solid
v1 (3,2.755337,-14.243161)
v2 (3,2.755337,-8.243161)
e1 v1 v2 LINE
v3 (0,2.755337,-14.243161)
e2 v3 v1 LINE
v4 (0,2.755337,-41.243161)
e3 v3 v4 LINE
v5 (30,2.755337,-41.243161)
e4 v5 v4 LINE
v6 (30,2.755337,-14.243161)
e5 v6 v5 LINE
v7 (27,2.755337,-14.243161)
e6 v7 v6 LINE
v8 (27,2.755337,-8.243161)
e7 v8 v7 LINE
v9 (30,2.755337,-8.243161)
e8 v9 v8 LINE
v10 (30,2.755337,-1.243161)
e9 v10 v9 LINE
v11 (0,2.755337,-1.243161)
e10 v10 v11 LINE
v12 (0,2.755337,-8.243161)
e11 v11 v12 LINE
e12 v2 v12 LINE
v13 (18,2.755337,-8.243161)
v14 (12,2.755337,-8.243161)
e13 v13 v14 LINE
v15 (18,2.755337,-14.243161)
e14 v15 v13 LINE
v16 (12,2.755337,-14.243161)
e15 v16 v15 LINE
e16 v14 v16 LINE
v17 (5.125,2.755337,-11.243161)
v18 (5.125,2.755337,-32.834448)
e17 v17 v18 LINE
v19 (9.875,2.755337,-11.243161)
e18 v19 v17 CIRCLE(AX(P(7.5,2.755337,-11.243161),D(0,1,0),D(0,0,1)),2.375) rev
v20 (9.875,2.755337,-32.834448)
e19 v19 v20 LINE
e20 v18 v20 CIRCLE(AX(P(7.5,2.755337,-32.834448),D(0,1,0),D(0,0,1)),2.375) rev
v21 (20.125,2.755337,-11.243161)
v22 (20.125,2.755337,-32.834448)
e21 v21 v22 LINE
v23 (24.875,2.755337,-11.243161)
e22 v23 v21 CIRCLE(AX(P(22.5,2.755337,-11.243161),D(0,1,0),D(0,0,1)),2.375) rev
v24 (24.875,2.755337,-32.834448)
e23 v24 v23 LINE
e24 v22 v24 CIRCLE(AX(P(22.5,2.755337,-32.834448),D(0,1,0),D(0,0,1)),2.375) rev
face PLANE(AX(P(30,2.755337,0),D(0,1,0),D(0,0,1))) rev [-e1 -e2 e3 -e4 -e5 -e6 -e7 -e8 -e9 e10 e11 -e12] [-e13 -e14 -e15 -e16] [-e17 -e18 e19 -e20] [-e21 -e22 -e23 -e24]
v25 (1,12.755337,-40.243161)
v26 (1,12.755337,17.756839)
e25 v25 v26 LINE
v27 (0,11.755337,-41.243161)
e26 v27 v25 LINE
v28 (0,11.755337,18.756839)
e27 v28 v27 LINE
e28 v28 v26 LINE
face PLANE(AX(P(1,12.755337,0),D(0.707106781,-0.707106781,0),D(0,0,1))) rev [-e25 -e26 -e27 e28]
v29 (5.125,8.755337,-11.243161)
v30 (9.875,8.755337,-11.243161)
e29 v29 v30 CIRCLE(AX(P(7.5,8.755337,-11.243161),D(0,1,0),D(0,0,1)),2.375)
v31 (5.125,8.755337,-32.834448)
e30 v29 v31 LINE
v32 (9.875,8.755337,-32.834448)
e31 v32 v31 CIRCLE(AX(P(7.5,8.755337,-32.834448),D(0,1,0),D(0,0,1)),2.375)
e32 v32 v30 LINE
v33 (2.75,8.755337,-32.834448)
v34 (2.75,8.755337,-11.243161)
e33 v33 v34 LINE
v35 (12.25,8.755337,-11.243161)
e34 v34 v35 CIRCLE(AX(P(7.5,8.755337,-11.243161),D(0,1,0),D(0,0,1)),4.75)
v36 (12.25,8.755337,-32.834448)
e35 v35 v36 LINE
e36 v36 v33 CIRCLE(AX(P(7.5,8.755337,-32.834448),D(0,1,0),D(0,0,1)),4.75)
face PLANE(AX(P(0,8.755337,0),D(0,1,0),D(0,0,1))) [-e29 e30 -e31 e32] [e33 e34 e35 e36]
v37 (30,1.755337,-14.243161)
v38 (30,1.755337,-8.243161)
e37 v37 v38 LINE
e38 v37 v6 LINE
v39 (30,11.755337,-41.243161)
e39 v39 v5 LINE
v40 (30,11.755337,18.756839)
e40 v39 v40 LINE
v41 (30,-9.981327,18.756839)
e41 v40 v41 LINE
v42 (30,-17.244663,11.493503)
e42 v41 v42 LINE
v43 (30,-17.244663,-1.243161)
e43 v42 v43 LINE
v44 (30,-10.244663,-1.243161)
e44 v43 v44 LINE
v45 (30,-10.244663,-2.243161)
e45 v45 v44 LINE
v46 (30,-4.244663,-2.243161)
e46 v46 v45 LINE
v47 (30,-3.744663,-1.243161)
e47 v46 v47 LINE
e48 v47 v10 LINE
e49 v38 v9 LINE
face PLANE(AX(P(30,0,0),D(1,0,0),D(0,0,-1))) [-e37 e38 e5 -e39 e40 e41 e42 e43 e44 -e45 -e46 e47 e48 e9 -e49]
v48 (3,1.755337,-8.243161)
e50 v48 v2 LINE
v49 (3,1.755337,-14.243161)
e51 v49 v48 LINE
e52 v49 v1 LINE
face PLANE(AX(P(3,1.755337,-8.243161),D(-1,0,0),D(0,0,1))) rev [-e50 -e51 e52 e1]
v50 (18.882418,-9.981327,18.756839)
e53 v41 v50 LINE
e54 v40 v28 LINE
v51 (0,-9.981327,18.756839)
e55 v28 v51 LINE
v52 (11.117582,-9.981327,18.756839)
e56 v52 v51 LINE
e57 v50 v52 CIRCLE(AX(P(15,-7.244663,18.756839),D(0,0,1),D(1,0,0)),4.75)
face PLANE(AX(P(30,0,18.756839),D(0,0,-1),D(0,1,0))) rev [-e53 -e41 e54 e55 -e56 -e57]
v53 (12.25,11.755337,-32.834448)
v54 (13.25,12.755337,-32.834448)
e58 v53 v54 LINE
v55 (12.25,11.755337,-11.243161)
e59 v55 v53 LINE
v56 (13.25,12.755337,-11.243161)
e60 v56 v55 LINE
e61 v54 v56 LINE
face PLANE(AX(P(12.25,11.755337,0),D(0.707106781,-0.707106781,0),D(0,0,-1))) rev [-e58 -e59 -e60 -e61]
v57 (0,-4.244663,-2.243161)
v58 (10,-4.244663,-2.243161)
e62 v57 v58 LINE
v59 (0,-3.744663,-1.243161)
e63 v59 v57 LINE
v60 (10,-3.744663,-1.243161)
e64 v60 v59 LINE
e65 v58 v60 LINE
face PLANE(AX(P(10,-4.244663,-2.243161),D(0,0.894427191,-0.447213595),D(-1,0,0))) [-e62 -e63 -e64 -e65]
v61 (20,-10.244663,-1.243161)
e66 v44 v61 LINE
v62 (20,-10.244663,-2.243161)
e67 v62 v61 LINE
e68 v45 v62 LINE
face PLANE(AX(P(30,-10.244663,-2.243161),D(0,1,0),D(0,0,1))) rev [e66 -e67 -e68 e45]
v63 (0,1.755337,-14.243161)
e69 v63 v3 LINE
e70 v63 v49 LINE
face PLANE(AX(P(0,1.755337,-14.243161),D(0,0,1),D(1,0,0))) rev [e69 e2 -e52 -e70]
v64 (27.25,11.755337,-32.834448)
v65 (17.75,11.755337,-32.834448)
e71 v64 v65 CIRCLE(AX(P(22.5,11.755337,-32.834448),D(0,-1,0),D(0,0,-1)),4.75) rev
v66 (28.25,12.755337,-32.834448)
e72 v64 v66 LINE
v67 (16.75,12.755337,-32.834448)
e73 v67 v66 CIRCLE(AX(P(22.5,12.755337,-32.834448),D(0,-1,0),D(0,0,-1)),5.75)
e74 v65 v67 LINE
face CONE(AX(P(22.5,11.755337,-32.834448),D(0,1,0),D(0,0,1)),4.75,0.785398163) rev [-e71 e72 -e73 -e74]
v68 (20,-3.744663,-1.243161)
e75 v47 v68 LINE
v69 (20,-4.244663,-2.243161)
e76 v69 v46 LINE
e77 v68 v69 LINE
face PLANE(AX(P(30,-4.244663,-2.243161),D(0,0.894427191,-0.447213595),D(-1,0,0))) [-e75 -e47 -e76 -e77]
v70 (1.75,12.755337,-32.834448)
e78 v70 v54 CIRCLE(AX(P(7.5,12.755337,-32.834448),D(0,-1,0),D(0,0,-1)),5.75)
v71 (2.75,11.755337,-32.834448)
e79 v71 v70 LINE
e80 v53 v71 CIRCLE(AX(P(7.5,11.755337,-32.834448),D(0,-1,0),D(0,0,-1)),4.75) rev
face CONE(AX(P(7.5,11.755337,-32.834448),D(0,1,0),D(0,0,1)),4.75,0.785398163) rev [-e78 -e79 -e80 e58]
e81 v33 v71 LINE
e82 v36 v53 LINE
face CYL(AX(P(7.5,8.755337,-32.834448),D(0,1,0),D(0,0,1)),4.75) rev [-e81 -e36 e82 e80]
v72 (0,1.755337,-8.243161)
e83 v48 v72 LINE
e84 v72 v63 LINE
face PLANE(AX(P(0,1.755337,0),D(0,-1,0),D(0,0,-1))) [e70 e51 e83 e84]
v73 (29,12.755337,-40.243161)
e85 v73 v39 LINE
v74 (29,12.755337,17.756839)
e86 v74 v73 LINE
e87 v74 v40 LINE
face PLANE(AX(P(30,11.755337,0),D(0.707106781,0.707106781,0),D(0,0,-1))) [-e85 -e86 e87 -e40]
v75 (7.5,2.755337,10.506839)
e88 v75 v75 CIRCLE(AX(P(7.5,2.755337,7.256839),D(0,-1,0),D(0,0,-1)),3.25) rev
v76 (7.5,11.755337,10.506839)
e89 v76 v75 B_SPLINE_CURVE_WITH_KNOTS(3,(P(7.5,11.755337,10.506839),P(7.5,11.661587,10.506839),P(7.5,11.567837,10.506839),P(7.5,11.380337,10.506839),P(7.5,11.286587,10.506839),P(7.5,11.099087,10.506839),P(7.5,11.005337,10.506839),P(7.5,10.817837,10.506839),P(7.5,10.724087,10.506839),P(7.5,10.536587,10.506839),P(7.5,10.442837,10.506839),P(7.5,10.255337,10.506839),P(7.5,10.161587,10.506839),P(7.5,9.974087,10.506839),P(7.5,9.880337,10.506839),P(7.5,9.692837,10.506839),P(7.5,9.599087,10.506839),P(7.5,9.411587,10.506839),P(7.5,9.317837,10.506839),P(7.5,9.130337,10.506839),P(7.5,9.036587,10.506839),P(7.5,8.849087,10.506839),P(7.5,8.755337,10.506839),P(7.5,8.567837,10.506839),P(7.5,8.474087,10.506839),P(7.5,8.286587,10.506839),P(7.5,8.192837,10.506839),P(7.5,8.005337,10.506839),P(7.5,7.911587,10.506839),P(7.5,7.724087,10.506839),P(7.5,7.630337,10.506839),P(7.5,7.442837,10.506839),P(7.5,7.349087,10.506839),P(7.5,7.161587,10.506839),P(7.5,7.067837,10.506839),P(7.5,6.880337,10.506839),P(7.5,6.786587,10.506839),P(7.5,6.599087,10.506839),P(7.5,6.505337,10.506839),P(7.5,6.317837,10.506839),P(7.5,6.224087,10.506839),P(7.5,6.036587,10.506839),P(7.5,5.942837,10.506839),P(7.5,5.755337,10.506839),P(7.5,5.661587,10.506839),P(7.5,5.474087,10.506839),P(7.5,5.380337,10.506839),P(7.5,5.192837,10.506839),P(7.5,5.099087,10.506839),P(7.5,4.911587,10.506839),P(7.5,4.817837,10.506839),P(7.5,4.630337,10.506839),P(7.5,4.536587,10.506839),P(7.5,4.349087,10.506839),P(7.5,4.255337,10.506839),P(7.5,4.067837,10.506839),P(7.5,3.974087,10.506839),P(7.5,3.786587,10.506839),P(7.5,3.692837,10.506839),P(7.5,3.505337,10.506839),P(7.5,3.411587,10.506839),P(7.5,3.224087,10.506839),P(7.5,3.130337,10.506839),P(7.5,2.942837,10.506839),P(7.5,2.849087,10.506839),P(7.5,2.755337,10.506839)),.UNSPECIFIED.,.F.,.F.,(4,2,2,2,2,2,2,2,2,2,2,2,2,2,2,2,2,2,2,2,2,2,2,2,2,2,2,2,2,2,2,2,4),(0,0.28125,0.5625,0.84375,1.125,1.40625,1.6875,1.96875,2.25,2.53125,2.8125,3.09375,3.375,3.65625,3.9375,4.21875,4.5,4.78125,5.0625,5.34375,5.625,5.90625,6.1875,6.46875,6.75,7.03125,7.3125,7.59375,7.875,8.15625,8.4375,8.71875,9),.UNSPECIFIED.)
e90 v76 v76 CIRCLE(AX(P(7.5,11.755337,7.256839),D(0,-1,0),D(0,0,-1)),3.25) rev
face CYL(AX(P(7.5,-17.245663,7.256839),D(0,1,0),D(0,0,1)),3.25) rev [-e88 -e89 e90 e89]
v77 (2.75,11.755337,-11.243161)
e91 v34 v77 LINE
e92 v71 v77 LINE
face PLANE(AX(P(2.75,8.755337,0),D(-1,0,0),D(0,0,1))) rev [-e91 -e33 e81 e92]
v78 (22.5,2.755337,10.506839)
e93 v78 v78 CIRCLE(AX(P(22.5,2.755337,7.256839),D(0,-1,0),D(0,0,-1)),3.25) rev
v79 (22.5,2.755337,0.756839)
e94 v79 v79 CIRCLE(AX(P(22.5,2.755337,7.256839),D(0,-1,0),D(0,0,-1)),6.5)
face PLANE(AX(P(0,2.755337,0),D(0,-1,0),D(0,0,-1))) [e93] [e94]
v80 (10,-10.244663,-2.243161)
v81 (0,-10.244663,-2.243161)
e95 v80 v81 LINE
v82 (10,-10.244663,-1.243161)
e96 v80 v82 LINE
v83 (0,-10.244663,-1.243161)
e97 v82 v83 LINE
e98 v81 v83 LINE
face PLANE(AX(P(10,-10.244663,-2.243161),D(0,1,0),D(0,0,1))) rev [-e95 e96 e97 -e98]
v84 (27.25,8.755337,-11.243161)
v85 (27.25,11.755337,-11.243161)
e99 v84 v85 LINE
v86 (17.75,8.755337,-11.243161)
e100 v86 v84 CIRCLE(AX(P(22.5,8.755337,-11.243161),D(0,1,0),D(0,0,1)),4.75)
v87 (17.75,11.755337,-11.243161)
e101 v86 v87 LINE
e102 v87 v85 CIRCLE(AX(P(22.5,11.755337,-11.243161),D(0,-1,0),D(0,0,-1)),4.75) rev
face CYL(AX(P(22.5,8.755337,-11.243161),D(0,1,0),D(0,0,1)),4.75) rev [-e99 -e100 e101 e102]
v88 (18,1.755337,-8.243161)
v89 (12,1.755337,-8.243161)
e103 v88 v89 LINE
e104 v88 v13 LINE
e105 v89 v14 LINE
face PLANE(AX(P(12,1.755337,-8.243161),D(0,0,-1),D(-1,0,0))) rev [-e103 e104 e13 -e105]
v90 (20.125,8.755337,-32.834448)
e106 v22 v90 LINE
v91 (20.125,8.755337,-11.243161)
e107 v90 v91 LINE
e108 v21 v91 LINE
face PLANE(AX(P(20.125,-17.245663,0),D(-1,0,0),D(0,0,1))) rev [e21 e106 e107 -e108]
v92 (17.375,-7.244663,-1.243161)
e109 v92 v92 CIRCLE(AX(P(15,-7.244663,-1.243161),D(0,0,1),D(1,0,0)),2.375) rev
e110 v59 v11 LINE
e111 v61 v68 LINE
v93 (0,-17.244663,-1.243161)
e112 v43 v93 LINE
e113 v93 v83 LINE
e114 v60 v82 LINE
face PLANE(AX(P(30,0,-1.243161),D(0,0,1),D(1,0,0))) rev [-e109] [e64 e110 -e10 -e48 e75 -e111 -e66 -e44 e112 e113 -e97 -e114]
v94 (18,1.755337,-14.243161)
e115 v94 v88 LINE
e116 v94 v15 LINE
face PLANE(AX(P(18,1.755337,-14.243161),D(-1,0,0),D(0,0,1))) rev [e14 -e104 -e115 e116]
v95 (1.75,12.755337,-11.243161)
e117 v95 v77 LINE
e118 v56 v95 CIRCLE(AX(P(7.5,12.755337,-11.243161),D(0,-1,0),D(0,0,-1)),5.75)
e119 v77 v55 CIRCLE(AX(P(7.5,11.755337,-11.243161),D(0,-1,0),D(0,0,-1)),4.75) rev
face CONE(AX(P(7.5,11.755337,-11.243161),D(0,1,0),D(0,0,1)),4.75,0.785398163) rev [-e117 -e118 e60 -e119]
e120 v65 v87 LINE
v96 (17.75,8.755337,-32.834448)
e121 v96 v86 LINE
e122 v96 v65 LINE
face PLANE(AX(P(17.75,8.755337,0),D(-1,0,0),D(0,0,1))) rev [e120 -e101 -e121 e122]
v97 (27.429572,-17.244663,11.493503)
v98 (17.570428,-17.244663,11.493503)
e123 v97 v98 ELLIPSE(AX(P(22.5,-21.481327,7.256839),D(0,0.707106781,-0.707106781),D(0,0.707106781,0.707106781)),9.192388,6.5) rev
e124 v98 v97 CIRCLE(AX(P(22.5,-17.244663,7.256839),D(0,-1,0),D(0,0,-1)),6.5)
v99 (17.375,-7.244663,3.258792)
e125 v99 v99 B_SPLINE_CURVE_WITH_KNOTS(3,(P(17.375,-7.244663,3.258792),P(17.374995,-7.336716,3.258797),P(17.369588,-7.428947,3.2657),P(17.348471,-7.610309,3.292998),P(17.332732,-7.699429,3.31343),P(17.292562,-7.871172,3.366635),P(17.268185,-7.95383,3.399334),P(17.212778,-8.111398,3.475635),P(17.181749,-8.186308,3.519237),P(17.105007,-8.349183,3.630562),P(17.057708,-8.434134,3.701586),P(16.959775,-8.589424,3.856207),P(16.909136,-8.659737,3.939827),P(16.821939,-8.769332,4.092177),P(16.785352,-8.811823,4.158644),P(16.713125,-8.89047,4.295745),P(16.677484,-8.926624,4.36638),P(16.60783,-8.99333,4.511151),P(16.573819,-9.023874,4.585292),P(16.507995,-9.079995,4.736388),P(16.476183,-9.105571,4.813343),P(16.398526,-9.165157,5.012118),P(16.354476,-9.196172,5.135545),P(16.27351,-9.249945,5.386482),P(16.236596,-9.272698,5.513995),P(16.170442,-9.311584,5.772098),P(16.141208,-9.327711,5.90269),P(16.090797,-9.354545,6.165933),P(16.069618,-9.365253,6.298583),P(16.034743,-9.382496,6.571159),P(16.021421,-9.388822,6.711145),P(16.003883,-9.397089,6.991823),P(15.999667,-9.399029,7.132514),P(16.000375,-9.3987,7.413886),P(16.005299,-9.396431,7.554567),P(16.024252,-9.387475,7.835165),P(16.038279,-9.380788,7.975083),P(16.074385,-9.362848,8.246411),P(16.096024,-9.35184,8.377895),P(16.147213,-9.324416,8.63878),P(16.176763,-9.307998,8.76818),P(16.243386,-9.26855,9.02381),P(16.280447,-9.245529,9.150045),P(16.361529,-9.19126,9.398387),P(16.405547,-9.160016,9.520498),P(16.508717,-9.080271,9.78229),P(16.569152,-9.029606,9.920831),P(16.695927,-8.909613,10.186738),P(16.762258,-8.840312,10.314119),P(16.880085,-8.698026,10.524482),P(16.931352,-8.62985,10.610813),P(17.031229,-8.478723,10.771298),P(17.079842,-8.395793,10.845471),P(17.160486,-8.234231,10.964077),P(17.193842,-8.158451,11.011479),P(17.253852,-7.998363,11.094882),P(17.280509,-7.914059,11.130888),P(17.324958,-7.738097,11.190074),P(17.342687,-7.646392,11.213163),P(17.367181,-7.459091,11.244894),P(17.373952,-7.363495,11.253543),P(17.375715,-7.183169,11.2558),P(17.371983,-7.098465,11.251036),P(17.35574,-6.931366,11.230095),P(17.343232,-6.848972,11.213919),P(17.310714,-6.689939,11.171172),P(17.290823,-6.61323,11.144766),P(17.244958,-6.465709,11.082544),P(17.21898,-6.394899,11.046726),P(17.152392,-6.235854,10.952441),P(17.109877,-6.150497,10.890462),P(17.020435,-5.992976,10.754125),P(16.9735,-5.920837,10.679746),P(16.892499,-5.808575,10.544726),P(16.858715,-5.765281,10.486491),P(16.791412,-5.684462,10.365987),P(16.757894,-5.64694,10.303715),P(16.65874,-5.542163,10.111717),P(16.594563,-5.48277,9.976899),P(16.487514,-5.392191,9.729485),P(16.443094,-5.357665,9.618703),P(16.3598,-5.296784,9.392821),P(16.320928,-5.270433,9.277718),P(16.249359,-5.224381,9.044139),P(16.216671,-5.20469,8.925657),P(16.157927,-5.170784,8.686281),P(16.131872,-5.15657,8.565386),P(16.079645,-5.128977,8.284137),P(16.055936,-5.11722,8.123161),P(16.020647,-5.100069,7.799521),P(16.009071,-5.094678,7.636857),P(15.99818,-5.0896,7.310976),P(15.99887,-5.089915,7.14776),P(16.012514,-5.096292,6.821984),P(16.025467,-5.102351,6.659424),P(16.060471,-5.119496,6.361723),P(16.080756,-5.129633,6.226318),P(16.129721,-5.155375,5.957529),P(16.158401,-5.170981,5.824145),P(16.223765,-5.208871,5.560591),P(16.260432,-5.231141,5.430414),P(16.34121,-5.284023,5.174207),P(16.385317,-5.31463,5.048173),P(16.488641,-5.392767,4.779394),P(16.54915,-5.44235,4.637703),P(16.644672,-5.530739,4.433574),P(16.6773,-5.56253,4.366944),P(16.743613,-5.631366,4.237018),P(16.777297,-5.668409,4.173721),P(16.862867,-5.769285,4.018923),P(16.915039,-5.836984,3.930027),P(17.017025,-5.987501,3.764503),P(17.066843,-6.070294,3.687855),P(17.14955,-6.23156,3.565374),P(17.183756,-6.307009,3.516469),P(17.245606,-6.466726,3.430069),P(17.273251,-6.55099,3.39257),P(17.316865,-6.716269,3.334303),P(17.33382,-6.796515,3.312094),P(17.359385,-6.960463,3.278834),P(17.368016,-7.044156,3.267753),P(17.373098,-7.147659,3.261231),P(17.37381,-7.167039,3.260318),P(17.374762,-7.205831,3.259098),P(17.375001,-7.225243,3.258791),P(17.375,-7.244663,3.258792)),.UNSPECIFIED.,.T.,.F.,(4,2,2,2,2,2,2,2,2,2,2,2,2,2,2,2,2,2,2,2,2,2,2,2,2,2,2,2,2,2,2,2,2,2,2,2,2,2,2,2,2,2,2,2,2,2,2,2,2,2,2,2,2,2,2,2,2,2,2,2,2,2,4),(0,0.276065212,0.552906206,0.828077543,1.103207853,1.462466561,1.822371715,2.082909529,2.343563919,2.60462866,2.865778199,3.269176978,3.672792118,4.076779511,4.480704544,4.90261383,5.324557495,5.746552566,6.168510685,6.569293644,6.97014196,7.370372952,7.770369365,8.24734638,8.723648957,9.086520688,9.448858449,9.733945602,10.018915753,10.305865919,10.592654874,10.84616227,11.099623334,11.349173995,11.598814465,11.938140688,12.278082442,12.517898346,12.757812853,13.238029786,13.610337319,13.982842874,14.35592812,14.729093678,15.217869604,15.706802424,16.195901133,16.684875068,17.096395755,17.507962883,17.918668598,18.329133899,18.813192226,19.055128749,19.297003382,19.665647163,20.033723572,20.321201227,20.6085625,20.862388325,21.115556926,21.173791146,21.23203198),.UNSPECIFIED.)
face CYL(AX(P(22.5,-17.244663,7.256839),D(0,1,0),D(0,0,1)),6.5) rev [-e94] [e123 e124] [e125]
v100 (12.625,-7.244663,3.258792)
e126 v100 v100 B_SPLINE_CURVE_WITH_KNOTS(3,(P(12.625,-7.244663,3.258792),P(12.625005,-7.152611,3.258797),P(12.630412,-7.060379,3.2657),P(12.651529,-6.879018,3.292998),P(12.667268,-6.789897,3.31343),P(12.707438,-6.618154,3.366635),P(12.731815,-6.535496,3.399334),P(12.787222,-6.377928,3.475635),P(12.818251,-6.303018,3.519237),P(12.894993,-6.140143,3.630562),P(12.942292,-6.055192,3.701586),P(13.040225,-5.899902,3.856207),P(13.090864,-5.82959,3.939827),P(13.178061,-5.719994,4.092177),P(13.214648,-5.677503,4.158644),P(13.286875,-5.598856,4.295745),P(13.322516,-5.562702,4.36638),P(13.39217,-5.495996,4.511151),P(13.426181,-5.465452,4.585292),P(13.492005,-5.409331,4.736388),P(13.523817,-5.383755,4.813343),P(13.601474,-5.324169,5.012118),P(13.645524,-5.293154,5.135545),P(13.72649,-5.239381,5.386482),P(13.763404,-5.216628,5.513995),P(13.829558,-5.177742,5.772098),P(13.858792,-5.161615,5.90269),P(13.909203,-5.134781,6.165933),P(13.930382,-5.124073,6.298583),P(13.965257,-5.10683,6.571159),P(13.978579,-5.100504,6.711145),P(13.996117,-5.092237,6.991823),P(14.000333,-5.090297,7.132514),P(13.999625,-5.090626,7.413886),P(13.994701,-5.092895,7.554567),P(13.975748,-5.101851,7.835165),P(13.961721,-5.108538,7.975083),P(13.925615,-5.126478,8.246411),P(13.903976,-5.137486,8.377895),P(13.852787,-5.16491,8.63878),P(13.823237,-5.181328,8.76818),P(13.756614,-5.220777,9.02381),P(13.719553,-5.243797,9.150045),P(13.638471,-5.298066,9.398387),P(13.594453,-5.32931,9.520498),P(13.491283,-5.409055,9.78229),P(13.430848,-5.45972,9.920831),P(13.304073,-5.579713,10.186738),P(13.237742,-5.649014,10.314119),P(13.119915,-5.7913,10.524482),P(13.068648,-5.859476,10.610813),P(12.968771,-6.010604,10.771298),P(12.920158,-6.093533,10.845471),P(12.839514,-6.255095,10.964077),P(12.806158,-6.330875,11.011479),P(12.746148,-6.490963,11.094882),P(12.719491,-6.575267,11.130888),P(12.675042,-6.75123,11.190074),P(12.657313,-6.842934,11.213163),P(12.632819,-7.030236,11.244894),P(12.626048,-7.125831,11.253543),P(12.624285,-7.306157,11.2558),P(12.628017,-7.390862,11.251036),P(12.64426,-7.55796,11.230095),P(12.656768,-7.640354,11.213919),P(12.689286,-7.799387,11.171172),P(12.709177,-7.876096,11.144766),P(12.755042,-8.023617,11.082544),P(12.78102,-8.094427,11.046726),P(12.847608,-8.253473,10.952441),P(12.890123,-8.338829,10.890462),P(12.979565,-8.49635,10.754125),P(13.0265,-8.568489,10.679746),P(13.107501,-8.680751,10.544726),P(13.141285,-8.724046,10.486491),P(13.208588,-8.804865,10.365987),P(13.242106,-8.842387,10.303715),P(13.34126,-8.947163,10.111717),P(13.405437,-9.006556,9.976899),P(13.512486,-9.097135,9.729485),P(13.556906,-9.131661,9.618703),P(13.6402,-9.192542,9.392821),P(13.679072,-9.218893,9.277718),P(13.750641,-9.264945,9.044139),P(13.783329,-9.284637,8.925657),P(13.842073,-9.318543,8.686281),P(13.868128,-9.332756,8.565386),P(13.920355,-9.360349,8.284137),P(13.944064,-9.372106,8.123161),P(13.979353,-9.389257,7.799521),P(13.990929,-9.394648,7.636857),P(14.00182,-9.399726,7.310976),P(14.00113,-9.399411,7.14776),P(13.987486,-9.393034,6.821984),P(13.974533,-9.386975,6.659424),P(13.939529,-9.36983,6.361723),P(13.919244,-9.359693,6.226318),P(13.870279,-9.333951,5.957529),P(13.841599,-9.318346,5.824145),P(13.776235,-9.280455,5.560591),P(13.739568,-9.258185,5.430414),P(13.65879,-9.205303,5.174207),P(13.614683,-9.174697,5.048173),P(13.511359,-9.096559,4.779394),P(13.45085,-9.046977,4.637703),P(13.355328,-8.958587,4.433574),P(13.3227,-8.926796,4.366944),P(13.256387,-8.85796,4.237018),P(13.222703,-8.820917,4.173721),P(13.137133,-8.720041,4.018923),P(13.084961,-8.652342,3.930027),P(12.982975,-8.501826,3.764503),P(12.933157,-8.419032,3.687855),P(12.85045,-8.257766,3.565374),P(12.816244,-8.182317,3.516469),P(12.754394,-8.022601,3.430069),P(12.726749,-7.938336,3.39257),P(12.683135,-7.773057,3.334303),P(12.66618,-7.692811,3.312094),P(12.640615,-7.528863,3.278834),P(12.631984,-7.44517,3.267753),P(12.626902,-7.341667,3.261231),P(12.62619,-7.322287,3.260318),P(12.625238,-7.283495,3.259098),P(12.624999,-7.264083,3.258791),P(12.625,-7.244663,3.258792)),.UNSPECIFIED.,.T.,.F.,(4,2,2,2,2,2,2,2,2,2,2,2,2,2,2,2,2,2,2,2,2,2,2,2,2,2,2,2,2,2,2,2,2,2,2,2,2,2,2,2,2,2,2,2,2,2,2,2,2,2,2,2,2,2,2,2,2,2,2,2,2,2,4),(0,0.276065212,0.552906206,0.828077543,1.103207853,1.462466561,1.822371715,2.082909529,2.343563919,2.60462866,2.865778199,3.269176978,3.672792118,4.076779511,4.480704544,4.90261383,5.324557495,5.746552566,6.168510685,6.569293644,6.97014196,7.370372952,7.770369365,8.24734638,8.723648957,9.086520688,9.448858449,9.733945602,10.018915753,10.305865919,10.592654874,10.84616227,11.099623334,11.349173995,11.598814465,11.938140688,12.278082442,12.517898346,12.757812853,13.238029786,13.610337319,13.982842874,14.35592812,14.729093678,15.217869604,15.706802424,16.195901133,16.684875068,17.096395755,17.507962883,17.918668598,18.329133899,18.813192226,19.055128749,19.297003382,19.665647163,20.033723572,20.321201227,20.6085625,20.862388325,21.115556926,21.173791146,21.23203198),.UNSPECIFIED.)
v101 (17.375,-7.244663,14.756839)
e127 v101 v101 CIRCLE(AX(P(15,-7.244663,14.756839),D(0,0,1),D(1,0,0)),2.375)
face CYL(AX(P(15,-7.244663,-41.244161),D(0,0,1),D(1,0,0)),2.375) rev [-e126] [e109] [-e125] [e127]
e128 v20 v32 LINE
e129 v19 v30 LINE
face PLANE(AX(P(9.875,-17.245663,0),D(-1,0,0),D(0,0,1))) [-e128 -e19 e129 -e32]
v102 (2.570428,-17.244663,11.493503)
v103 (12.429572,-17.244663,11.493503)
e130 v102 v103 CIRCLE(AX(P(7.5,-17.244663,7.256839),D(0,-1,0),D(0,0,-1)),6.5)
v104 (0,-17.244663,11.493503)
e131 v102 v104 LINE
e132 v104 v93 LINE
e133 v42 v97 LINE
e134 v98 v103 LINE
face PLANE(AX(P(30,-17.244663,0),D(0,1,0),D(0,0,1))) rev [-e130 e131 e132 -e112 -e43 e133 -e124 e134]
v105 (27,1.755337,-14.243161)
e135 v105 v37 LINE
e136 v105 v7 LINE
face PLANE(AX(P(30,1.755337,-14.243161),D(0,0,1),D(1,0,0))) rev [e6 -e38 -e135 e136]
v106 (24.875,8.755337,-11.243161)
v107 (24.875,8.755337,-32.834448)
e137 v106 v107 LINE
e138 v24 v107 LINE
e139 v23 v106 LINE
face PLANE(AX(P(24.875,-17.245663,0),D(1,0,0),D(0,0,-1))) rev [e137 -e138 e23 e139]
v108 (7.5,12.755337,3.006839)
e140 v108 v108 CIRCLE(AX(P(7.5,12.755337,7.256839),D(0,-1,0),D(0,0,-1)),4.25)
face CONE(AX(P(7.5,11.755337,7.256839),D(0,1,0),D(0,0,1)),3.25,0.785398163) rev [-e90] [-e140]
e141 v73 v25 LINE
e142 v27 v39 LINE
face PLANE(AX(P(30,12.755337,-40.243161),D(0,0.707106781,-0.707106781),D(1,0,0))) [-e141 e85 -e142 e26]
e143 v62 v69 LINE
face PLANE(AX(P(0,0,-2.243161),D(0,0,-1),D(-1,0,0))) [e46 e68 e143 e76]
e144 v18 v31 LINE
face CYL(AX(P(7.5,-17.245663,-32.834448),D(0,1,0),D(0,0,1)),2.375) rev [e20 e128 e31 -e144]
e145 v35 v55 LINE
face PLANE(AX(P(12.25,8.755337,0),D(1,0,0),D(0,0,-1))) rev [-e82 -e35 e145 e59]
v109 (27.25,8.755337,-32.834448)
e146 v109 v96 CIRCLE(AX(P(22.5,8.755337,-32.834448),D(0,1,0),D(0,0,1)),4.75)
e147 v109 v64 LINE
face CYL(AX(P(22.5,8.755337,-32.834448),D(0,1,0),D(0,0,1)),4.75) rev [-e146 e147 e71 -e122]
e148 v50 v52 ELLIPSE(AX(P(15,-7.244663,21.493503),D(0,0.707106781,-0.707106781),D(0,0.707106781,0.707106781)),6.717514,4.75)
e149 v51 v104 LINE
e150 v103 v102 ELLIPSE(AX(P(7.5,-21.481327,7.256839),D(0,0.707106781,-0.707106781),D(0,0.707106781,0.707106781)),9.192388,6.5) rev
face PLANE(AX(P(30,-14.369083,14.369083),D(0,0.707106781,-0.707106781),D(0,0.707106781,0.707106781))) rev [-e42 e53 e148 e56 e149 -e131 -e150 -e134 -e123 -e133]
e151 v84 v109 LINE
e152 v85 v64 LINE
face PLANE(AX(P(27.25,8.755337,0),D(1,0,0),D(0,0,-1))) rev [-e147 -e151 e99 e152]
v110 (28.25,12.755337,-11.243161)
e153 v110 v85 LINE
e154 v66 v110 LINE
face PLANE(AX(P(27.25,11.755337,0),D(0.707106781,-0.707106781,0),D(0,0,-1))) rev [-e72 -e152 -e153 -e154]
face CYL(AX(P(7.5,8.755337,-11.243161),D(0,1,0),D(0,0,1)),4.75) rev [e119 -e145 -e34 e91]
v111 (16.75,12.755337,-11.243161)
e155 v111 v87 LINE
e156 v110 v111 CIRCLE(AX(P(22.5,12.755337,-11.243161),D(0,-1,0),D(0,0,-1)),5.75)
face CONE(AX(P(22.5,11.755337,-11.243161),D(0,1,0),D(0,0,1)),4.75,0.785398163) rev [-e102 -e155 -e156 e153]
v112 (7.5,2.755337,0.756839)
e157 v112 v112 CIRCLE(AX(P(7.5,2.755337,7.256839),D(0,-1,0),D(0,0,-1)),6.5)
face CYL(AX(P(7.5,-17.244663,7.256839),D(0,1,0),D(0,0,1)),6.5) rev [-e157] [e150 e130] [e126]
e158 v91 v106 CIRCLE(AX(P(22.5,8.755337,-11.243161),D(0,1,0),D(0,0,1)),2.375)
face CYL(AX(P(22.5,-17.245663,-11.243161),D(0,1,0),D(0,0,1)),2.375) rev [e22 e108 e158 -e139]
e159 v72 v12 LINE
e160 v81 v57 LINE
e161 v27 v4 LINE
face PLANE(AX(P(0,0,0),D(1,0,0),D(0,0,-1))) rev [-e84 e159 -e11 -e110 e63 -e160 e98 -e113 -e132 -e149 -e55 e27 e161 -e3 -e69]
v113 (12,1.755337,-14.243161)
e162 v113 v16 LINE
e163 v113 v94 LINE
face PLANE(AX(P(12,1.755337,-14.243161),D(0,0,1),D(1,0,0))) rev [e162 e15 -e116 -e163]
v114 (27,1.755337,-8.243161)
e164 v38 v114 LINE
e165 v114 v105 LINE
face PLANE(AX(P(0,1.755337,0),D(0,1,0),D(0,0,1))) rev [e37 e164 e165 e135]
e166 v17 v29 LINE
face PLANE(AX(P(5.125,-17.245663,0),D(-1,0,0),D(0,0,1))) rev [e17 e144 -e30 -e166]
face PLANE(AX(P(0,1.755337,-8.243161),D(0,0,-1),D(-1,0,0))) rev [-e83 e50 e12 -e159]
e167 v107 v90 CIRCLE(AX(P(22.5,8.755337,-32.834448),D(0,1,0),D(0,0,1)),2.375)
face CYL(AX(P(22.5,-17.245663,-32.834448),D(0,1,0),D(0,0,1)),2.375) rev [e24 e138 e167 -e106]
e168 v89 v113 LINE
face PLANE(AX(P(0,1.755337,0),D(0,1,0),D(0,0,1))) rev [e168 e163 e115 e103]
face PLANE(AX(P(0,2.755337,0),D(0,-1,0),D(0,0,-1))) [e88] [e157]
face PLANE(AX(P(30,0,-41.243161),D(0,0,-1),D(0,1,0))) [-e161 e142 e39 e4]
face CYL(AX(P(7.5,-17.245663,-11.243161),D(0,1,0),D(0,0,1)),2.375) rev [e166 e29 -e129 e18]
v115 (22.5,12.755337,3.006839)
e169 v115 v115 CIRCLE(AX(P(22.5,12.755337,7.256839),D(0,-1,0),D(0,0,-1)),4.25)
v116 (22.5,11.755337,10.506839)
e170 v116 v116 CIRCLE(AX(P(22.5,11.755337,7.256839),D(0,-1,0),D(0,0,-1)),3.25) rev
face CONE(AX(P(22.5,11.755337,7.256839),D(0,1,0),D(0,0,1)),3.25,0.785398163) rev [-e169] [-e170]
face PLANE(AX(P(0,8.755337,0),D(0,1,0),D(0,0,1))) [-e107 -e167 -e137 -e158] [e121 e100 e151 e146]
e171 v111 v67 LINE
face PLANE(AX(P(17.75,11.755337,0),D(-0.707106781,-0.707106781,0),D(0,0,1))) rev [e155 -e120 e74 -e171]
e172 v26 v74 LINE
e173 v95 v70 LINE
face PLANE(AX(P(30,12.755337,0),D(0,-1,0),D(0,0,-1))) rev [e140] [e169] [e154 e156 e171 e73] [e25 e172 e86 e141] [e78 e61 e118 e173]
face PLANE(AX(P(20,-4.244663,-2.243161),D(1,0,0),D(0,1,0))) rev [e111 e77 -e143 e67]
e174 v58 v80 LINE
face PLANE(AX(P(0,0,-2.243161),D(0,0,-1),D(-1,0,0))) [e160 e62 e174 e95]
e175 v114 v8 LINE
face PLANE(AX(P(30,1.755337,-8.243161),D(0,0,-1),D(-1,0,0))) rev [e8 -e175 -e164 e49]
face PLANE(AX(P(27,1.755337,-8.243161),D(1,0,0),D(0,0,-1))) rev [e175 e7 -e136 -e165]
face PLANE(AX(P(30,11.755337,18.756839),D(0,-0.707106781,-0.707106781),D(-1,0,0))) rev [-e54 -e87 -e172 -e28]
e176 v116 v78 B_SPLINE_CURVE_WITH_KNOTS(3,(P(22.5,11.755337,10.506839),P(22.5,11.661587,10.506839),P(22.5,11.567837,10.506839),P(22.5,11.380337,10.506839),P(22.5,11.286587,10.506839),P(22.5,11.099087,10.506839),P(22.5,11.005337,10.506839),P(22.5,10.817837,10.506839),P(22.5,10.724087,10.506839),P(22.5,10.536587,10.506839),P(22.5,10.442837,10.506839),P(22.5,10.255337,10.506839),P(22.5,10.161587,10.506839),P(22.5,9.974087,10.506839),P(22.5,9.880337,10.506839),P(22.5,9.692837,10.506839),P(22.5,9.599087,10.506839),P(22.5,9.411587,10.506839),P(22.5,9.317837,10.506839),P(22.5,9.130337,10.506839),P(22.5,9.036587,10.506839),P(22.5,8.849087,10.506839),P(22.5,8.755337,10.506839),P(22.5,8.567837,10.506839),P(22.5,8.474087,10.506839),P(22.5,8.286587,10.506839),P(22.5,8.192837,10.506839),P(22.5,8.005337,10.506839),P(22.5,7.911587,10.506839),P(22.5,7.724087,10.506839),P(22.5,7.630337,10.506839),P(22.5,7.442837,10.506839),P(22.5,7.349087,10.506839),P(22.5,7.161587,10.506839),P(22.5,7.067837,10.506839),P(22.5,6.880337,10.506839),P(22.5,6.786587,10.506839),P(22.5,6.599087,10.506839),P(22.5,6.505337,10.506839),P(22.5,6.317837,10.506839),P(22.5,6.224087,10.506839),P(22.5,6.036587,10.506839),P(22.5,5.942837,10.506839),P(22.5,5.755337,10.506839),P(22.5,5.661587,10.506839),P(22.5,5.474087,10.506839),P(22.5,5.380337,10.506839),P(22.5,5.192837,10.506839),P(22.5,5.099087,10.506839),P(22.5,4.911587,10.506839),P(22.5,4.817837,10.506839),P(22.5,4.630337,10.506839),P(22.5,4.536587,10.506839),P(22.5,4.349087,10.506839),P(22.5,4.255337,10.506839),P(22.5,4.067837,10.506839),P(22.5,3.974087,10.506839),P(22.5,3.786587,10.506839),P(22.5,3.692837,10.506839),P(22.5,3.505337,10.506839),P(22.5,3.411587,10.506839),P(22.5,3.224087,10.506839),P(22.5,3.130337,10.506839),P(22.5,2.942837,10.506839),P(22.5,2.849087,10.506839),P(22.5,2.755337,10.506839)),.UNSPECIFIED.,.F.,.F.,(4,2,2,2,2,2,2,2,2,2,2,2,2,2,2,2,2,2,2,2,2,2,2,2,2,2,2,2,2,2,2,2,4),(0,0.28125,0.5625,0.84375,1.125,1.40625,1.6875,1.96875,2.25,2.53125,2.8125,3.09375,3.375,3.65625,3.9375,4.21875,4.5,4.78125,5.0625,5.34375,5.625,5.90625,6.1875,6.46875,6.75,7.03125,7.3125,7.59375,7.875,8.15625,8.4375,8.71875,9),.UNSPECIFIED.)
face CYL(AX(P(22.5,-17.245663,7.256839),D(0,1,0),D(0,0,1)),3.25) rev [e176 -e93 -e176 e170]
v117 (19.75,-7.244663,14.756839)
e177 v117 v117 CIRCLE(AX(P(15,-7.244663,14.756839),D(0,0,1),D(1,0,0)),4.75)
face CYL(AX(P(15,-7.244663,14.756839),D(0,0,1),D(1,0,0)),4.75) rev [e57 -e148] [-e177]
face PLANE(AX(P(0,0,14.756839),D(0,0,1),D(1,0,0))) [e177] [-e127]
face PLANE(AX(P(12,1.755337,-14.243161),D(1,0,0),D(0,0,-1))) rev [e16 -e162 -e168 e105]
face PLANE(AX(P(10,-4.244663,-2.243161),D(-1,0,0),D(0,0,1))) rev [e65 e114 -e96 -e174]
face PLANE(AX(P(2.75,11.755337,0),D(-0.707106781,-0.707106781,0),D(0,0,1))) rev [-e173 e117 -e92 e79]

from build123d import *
from OCP.BRepFilletAPI import BRepFilletAPI_MakeChamfer

# Parameters (mm, degrees)
RESSALTO_EXTRUS_O1_DEPTH = 30
CORTE_EXTRUS_O1_REACH    = 61.169
ESBO_O2_R                = 3.25
CORTE_EXTRUS_O3_START    = 8.755336939
CORTE_EXTRUS_O3_DEPTH    = 4
CORTE_EXTRUS_O2_REACH    = 71.263
ESBO_O3_R                = 2.375
ESBO_O3_3_R              = 2.375
CORTE_EXTRUS_O4_DEPTH    = 4
ESBO_O4_W                = 6
ESBO_O4_H                = 6
ESBO_O4_W_2              = 3
RESSALTO_EXTRUS_O2_DEPTH = 1
ESBO_O5_R                = 6.5
CORTE_EXTRUS_O5_DEPTH    = 55.781368683
CHANFRO1_SIZE            = 1
ESBO_O6_W                = 10
ESBO_O6_H                = 6
RESSALTO_EXTRUS_O3_DEPTH = 1
CHANFRO2_SIZE            = 0.5
CHANFRO2_SIZE_2          = 1


# Read off the part's stored shape, not the designer's step: Corte-extrusão3
with BuildPart() as part:
    # Esboço1 → Ressalto-extrusão1 (new body)
    with BuildSketch(Plane(origin=(0, 0, 0), x_dir=(0, 0, -1), z_dir=(1, 0, 0))):
        Polygon((1.243161309, 2.755336939), (41.243161309, 2.755336939), (41.243161309, 12.755336939), (-18.756838691, 12.755336939), (-18.756838691, -9.981327227), (-11.493502857, -17.244663061), (1.243161309, -17.244663061), align=None)
    extrude(amount=RESSALTO_EXTRUS_O1_DEPTH)

    # Esboço2 → Corte-extrusão1 (cut, up to next)
    with BuildSketch(Plane(origin=(0, 12.755336939, 0), x_dir=(1, 0, 0), z_dir=(0, 1, 0)), mode=Mode.PRIVATE) as corte_extrus_o1_sk1:
        with BuildLine():
            Line((5.125, 32.834447928), (5.125, 11.243161309))
            ThreePointArc((5.125, 11.243161309), (7.5, 8.868161309), (9.875, 11.243161309))
            Line((9.875, 11.243161309), (9.875, 32.834447928))
            ThreePointArc((9.875, 32.834447928), (7.5, 35.209447928), (5.125, 32.834447928))
        make_face()
    corte_extrus_o1_tool1 = extrude(corte_extrus_o1_sk1.sketch, amount=-CORTE_EXTRUS_O1_REACH, mode=Mode.PRIVATE) & part.part
    # Esboço2 → Corte-extrusão1 (cut, up to next)
    with BuildSketch(Plane(origin=(0, 12.755336939, 0), x_dir=(1, 0, 0), z_dir=(0, 1, 0)), mode=Mode.PRIVATE) as corte_extrus_o1_sk2:
        with BuildLine():
            Line((20.125, 32.834447928), (20.125, 11.243161309))
            ThreePointArc((20.125, 11.243161309), (22.5, 8.868161309), (24.875, 11.243161309))
            Line((24.875, 11.243161309), (24.875, 32.834447928))
            ThreePointArc((24.875, 32.834447928), (22.5, 35.209447928), (20.125, 32.834447928))
        make_face()
    corte_extrus_o1_tool2 = extrude(corte_extrus_o1_sk2.sketch, amount=-CORTE_EXTRUS_O1_REACH, mode=Mode.PRIVATE) & part.part
    # Esboço2 → Corte-extrusão1 (cut, up to next)
    with BuildSketch(Plane(origin=(0, 12.755336939, 0), x_dir=(1, 0, 0), z_dir=(0, 1, 0)), mode=Mode.PRIVATE) as corte_extrus_o1_sk3:
        with Locations(Location((7.5, -7.256838691, 0), (0, 0, 270))):
            Circle(ESBO_O2_R)
    corte_extrus_o1_tool3 = extrude(corte_extrus_o1_sk3.sketch, amount=-CORTE_EXTRUS_O1_REACH, mode=Mode.PRIVATE) & part.part
    # Esboço2 → Corte-extrusão1 (cut, up to next)
    with BuildSketch(Plane(origin=(0, 12.755336939, 0), x_dir=(1, 0, 0), z_dir=(0, 1, 0)), mode=Mode.PRIVATE) as corte_extrus_o1_sk4:
        with Locations(Location((22.5, -7.256838691, 0), (0, 0, 270))):
            Circle(ESBO_O2_R)
    corte_extrus_o1_tool4 = extrude(corte_extrus_o1_sk4.sketch, amount=-CORTE_EXTRUS_O1_REACH, mode=Mode.PRIVATE) & part.part
    add(corte_extrus_o1_tool1.solids().sort_by_distance((7.5, 12.755337, -22.038805))[0], mode=Mode.SUBTRACT)
    add(corte_extrus_o1_tool2.solids().sort_by_distance((22.5, 12.755337, -22.038805))[0], mode=Mode.SUBTRACT)
    add(corte_extrus_o1_tool3.solids().sort_by_distance((7.5, 12.755337, 7.256839))[0], mode=Mode.SUBTRACT)
    add(corte_extrus_o1_tool4.solids().sort_by_distance((22.5, 12.755337, 7.256839))[0], mode=Mode.SUBTRACT)

    # Corte-extrusão3 outline → Corte-extrusão3 (cut)
    # profile 1 of 2: a face of its own
    with BuildSketch(Plane(origin=(0, 0, 0), x_dir=(1, 0, 0), z_dir=(0, 1, 0)).offset(CORTE_EXTRUS_O3_START)):
        with BuildLine():
            ThreePointArc((2.75, 11.243161309), (7.5, 6.493161309), (12.25, 11.243161309))
            Line((12.25, 11.243161309), (12.25, 32.834447928))
            ThreePointArc((12.25, 32.834447928), (7.5, 37.584447928), (2.75, 32.834447928))
            Line((2.75, 32.834447928), (2.75, 11.243161309))
        make_face()
        with BuildLine():
            ThreePointArc((5.125, 32.834447928), (7.5, 35.209447928), (9.875, 32.834447928))
            Line((9.875, 32.834447928), (9.875, 11.243161309))
            ThreePointArc((9.875, 11.243161309), (7.5, 8.868161309), (5.125, 11.243161309))
            Line((5.125, 11.243161309), (5.125, 32.834447928))
        make_face(mode=Mode.SUBTRACT)
    # profile 2 of 2: a face of its own
    with BuildSketch(Plane(origin=(0, 0, 0), x_dir=(1, 0, 0), z_dir=(0, 1, 0)).offset(CORTE_EXTRUS_O3_START)):
        with BuildLine():
            ThreePointArc((17.75, 11.243161309), (22.5, 6.493161309), (27.25, 11.243161309))
            Line((27.25, 11.243161309), (27.25, 32.834447928))
            ThreePointArc((27.25, 32.834447928), (22.5, 37.584447928), (17.75, 32.834447928))
            Line((17.75, 32.834447928), (17.75, 11.243161309))
        make_face()
        with BuildLine():
            Line((20.125, 11.243161309), (20.125, 32.834447928))
            ThreePointArc((20.125, 32.834447928), (22.5, 35.209447928), (24.875, 32.834447928))
            Line((24.875, 32.834447928), (24.875, 11.243161309))
            ThreePointArc((24.875, 11.243161309), (22.5, 8.868161309), (20.125, 11.243161309))
        make_face(mode=Mode.SUBTRACT)
    extrude(amount=CORTE_EXTRUS_O3_DEPTH, mode=Mode.SUBTRACT)

    # Esboço3 → Corte-extrusão2 (cut, up to next)
    with BuildSketch(Plane.XY.offset(18.756838691), mode=Mode.PRIVATE) as corte_extrus_o2_sk1:
        with Locations((15, -7.244663061)):
            Circle(ESBO_O3_R)
    corte_extrus_o2_tool1 = extrude(corte_extrus_o2_sk1.sketch, amount=-CORTE_EXTRUS_O2_REACH, mode=Mode.PRIVATE) & part.part
    add(corte_extrus_o2_tool1.solids().sort_by_distance((15, -7.244663, 18.756839))[0], mode=Mode.SUBTRACT)

    # Esboço3<3> → Corte-extrusão4 (cut)
    # profile 1 of 2: a face of its own
    with BuildSketch(Plane.XY.offset(18.756838691)):
        with BuildLine():
            Line((18.882417963, -9.981327227), (11.117582037, -9.981327227))
            ThreePointArc((11.117582037, -9.981327227), (15, -11.994663061), (18.882417963, -9.981327227))
        make_face()
    # profile 2 of 2: a face of its own
    with BuildSketch(Plane.XY.offset(18.756838691)):
        with BuildLine():
            ThreePointArc((18.882417963, -9.981327227), (19.527912617, -8.680109799), (19.75, -7.244663061))
            ThreePointArc((19.75, -7.244663061), (13.564553262, -2.716750444), (11.117582037, -9.981327227))
            Line((11.117582037, -9.981327227), (18.882417963, -9.981327227))
        make_face()
        with Locations((15, -7.244663061)):
            Circle(ESBO_O3_3_R, mode=Mode.SUBTRACT)
    extrude(amount=-CORTE_EXTRUS_O4_DEPTH, mode=Mode.SUBTRACT)

    # Esboço4 → Ressalto-extrusão2 (add)
    with BuildSketch(Plane.XZ.offset(-2.755336939)):
        with Locations((15, -11.243161309)):
            Rectangle(ESBO_O4_W, ESBO_O4_H)
        with Locations((1.5, -11.243161309)):
            Rectangle(ESBO_O4_W_2, ESBO_O4_H)
        with Locations((28.5, -11.243161309)):
            Rectangle(ESBO_O4_W_2, ESBO_O4_H)
    extrude(amount=RESSALTO_EXTRUS_O2_DEPTH)

    # Esboço5 → Corte-extrusão5 (cut, through all)
    with BuildSketch(Plane.XZ.offset(-2.755336939)):
        with Locations(Location((7.5, 7.256838691, 0), (0, 0, 40.677035539))):
            Circle(ESBO_O5_R)
        with Locations(Location((22.5, 7.256838691, 0), (0, 0, 40.677035539))):
            Circle(ESBO_O5_R)
    extrude(amount=CORTE_EXTRUS_O5_DEPTH, mode=Mode.SUBTRACT)

    # Chanfro1
    chanfro1_edges = [part.edges().sort_by_distance(p)[0] for p in [
        (27.25, 12.755336939, -22.038804619),
        (22.5, 12.755336939, -37.584447928),
        (17.75, 12.755336939, -22.038804619),
        (22.5, 12.755336939, -6.493161309),
        (15, 12.755336939, 18.756838691),
        (15, 12.755336939, -41.243161309),
        (30, 12.755336939, -11.243161309),
        (7.5, 12.755336939, 4.006838691),
        (22.5, 12.755336939, 4.006838691),
        (12.25, 12.755336939, -22.038804619),
        (7.5, 12.755336939, -37.584447928),
        (2.75, 12.755336939, -22.038804619),
        (7.5, 12.755336939, -6.493161309),
        (0, 12.755336939, -11.243161309),
    ]]
    chamfer(chanfro1_edges, length=CHANFRO1_SIZE)

    # Esboço6 → Ressalto-extrusão3 (add)
    with BuildSketch(Plane(origin=(0, 0, -1.243161309), x_dir=(-1, 0, 0), z_dir=(0, 0, -1))):
        with Locations((-25, -7.244663061)):
            Rectangle(ESBO_O6_W, ESBO_O6_H)
        with Locations((-5, -7.244663061)):
            Rectangle(ESBO_O6_W, ESBO_O6_H)
    extrude(amount=RESSALTO_EXTRUS_O3_DEPTH)

    # Chanfro2
    chanfro2_edges_1 = [part.edges().sort_by_distance(p)[0] for p in [
        (25, -4.244663061, -1.243161309),
    ]]
    chanfro2_side_1 = [part.faces().sort_by_distance(p)[0] for p in [
        (25, -4.234663061, -1.243161309),
    ]]
    chanfro2_edges_2 = [part.edges().sort_by_distance(p)[0] for p in [
        (5, -4.244663061, -1.243161309),
    ]]
    chanfro2_side_2 = [part.faces().sort_by_distance(p)[0] for p in [
        (5, -4.234663061, -1.243161309),
    ]]
    chanfro2 = BRepFilletAPI_MakeChamfer(part.part.solid().wrapped)
    for e in chanfro2_edges_1:
        chanfro2.Add(CHANFRO2_SIZE - 0.0001, CHANFRO2_SIZE_2 - 0.0001, e.wrapped, chanfro2_side_1[0].wrapped)
    for e in chanfro2_edges_2:
        chanfro2.Add(CHANFRO2_SIZE - 0.0001, CHANFRO2_SIZE_2 - 0.0001, e.wrapped, chanfro2_side_2[0].wrapped)
    add(Compound.cast(chanfro2.Shape()), mode=Mode.REPLACE)  # a hair under: the kernel refuses the full size


solid = part.part
